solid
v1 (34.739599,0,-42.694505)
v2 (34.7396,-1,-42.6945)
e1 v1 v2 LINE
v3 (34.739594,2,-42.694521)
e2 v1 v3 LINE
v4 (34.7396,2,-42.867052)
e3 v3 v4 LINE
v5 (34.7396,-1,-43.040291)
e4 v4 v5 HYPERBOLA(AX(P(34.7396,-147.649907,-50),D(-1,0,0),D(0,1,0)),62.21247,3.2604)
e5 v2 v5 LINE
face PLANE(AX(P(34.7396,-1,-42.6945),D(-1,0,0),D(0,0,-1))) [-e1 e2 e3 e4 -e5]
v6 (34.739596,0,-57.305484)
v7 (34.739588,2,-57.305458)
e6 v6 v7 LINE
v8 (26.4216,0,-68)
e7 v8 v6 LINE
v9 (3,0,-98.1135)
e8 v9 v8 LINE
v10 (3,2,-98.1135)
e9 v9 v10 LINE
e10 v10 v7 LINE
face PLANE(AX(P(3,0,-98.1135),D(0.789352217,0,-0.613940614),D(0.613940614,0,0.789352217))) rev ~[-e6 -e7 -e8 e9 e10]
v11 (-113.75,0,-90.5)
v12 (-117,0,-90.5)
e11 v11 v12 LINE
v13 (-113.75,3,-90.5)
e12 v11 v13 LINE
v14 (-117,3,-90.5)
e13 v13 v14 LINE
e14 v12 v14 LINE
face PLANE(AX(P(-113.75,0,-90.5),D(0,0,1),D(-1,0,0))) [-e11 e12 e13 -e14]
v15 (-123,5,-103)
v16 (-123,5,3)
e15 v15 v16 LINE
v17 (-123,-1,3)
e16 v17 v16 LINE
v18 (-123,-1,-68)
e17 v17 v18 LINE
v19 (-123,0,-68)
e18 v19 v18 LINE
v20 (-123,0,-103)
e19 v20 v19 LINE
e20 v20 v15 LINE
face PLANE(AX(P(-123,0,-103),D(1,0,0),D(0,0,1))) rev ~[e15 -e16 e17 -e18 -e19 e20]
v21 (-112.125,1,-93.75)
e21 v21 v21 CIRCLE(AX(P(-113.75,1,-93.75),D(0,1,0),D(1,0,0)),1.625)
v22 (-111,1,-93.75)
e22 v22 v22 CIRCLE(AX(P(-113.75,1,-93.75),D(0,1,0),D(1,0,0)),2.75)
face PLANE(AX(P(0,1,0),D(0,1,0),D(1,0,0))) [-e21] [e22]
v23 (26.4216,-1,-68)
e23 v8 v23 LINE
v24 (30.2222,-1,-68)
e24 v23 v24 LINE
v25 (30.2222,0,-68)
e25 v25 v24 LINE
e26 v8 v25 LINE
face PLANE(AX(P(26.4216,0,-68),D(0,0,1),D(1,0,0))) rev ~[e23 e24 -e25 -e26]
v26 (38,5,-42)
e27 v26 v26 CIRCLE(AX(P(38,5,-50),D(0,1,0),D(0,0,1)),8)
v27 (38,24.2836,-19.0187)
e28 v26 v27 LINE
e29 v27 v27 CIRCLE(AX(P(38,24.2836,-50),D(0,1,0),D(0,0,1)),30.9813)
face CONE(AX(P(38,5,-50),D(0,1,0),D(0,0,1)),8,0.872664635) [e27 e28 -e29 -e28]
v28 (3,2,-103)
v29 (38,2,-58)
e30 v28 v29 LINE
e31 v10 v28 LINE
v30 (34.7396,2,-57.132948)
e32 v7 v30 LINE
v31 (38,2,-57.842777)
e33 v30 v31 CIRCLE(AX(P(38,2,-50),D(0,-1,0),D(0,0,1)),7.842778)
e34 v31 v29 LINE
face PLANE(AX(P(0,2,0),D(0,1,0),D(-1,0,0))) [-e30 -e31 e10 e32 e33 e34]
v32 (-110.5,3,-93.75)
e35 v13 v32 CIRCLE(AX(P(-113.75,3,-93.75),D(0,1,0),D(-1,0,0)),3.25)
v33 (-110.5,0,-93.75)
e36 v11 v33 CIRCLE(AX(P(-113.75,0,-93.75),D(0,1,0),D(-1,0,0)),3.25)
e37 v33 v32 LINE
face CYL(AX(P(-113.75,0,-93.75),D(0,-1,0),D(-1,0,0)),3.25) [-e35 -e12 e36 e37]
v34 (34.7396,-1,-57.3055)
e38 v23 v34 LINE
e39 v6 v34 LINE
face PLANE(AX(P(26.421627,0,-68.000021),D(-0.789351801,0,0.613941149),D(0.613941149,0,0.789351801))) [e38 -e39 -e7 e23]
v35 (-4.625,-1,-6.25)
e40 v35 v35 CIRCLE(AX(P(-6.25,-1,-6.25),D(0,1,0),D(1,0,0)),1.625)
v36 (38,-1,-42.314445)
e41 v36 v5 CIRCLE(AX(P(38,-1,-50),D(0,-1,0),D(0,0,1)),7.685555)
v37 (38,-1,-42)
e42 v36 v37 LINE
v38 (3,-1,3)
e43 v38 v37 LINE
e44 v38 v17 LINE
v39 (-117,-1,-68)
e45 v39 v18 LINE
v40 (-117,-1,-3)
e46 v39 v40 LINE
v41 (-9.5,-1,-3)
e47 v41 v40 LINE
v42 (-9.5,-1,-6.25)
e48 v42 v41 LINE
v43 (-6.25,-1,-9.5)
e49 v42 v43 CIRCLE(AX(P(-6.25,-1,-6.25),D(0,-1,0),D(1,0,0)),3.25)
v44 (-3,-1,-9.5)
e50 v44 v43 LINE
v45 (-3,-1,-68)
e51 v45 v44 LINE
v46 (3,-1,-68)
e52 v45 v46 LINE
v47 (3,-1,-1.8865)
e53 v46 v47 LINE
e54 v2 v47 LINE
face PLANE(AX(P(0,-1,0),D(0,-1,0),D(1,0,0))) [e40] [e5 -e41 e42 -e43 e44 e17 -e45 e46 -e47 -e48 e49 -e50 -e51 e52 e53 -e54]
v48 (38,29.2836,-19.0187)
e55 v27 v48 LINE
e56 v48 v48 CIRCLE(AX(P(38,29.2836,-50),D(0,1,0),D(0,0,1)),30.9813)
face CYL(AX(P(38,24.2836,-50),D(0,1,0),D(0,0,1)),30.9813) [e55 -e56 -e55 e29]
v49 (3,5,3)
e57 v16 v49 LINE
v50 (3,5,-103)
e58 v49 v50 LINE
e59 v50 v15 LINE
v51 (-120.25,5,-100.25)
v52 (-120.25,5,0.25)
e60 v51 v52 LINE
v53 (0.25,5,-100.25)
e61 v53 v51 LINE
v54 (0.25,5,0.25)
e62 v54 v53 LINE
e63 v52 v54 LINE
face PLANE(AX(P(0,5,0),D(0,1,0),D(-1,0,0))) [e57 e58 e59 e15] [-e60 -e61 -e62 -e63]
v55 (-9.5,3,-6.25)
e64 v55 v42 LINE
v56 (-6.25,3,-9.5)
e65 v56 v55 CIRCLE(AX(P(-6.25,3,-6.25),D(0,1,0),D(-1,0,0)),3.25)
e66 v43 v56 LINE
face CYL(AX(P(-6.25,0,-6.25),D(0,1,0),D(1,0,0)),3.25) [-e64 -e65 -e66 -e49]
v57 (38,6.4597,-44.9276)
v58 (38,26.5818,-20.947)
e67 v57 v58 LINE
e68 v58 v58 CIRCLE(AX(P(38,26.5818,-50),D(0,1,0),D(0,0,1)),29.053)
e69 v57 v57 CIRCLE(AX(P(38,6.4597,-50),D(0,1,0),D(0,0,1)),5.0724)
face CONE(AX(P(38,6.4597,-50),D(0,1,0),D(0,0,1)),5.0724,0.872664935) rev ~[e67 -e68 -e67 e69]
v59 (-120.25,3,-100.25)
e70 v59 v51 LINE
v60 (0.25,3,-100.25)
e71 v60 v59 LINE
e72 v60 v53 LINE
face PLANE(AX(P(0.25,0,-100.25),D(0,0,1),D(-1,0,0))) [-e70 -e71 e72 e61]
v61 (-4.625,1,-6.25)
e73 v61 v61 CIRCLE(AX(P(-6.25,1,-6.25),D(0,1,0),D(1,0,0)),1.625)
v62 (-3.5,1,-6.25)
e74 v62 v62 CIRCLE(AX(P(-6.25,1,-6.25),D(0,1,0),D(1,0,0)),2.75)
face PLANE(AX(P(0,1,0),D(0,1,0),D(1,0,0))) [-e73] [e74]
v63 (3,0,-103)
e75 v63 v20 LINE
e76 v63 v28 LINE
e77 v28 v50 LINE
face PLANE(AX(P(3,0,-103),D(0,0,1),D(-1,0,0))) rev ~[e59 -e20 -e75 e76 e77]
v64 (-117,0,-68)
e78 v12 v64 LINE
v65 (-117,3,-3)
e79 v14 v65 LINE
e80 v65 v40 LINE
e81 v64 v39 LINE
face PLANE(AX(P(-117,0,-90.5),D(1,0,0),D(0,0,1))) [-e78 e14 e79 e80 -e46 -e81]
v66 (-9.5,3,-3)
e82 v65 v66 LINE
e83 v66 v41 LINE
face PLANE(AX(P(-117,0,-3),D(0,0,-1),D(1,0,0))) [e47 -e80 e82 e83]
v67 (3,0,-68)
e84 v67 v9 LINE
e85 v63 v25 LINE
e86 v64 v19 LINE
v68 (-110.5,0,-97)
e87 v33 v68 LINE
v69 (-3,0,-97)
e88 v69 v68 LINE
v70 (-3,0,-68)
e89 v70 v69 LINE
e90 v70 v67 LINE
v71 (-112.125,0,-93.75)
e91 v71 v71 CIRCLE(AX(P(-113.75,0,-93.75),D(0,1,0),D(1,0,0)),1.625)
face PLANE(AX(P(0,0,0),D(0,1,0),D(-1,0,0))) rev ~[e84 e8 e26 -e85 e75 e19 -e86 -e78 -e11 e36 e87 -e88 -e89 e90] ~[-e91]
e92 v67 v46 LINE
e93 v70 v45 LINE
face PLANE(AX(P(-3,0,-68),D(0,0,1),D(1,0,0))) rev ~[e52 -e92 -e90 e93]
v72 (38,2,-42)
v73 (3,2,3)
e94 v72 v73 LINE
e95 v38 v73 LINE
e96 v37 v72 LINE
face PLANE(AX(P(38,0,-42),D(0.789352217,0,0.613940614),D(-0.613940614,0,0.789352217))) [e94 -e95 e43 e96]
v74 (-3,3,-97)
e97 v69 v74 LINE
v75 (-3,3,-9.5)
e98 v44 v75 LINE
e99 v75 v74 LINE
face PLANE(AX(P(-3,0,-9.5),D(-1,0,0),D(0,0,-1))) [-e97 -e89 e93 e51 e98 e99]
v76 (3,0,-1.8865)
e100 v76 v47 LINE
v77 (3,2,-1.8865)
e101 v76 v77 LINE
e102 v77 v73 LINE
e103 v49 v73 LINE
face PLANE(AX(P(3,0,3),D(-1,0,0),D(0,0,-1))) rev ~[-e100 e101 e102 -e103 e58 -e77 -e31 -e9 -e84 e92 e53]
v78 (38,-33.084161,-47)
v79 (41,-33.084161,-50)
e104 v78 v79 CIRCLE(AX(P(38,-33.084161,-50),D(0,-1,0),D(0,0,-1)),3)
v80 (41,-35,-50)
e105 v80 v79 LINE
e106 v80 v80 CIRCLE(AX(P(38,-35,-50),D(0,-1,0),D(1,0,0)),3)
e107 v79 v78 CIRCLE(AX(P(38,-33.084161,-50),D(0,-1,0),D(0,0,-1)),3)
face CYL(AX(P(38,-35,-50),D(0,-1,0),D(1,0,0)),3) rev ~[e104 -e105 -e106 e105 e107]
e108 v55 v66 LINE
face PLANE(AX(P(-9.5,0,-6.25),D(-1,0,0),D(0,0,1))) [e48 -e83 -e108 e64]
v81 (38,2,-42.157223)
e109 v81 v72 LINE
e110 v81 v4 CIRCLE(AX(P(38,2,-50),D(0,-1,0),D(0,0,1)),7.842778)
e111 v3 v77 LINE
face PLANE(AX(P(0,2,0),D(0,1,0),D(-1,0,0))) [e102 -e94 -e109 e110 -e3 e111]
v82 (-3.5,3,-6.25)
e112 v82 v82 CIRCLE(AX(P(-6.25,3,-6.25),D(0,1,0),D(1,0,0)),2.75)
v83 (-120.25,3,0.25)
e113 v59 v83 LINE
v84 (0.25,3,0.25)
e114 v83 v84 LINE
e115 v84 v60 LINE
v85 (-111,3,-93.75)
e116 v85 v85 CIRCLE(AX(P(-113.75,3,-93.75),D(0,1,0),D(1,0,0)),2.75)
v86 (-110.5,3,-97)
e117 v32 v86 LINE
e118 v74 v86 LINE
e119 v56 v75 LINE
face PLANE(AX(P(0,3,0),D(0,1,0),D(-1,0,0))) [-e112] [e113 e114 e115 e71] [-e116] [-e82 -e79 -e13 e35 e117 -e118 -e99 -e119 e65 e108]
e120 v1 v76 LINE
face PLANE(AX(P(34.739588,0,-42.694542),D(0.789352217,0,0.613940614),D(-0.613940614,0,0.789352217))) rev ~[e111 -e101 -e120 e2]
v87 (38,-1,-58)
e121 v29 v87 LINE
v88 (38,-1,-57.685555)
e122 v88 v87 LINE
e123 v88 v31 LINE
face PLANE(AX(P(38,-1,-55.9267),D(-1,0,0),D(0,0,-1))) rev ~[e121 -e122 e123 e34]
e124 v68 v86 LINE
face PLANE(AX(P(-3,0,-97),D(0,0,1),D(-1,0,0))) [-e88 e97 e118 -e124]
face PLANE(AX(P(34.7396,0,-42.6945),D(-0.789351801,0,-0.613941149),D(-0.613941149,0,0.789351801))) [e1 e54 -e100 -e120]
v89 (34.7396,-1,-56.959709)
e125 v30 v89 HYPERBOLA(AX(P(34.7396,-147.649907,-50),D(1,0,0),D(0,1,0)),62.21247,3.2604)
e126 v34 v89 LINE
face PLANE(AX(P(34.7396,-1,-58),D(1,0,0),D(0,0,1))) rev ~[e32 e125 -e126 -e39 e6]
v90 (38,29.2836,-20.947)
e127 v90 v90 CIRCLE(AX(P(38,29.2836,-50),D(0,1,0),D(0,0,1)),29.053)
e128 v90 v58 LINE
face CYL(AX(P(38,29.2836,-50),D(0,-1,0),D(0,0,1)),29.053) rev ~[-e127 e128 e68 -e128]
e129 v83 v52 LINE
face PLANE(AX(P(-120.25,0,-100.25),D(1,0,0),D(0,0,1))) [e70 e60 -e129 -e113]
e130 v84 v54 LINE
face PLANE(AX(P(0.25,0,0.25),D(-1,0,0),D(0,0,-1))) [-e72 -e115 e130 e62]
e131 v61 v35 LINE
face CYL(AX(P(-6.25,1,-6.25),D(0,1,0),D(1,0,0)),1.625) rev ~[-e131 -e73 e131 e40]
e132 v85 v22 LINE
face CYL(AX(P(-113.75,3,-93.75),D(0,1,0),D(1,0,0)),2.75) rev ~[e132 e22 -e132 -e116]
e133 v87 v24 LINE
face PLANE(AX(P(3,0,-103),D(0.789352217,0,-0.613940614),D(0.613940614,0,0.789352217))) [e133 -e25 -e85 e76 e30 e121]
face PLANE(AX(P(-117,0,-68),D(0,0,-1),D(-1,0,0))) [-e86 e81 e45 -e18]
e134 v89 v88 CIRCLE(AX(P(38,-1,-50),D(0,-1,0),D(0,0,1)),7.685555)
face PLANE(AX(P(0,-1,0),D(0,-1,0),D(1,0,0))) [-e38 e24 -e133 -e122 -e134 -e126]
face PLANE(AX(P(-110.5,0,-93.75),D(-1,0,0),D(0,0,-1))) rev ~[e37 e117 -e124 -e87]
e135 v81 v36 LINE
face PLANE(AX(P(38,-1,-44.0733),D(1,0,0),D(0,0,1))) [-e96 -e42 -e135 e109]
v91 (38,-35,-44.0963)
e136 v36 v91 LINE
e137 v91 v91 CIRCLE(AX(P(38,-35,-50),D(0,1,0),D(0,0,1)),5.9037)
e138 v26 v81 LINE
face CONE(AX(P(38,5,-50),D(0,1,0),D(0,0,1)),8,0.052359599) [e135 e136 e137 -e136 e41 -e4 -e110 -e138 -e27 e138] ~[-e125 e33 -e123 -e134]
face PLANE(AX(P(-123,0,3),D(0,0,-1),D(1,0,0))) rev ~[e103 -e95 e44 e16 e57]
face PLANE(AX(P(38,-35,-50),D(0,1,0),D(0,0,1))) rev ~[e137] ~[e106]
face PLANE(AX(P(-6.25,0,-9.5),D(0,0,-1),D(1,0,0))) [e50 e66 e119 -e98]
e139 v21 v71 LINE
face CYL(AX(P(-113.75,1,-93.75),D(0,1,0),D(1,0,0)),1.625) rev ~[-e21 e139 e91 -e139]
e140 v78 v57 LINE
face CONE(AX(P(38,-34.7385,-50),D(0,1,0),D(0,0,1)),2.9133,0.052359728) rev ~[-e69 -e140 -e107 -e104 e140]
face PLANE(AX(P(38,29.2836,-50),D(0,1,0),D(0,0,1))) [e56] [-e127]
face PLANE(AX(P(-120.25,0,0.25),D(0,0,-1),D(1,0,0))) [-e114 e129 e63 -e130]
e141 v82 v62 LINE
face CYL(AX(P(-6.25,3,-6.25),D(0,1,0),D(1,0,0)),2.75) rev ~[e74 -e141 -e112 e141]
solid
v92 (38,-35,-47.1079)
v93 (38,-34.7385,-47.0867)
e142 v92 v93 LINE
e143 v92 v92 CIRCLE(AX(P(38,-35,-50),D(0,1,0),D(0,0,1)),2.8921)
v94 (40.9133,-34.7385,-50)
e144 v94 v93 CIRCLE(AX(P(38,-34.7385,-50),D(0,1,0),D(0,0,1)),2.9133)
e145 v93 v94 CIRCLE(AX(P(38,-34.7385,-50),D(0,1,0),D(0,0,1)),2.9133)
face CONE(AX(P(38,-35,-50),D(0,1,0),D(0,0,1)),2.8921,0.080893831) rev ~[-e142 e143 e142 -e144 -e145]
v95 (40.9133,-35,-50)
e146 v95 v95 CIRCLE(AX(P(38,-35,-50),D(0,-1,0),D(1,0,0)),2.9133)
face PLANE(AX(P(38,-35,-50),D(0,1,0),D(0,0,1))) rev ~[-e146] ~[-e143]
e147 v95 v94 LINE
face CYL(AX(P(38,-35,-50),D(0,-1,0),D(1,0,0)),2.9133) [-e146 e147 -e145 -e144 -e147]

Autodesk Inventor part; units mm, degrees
ref_plane "YZ Plane" through (0, 0, 0) normal (1, 0, 0) x (0, 1, 0)
ref_plane "XZ Plane" through (0, 0, 0) normal (0, 1, 0) x (-1, 0, 0)
ref_plane "XY Plane" through (0, 0, 0) normal (0, 0, 1) x (1, 0, 0)
sketch "Sketch1" plane through (0, 0, 0) normal (0, 1, 0) x (-1, 0, 0)
  line L0 (0, 0) -> (120, 0)
  line L1 (120, 0) -> (120, -100)
  line L2 (120, -100) -> (0, -100)
  line L3 (0, -100) -> (0, 0)
  line L4 (117, -97) -> (117, -3)
  line L5 (117, -3) -> (3, -3)
  line L6 (3, -3) -> (3, -97)
  line L7 (3, -97) -> (117, -97)
  line L8 (123, -103) -> (123, 3)
  line L9 (123, 3) -> (-3, 3)
  line L10 (-3, 3) -> (-3, -103)
  line L11 (-3, -103) -> (123, -103)
  line L12 (120.25, -100.25) -> (120.25, 0.25)
  line L13 (120.25, 0.25) -> (-0.25, 0.25)
  line L14 (-0.25, 0.25) -> (-0.25, -100.25)
  line L15 (-0.25, -100.25) -> (120.25, -100.25)
  circle A0 centre (6.25, -6.25) radius 3.25
  line L16 (9.5, -6.25) -> (9.5, -3)
  line L17 (6.25, -9.5) -> (3, -9.5)
  circle A1 centre (113.75, -93.75) radius 3.25
  line L18 (113.75, -90.5) -> (117, -90.5)
  line L19 (110.5, -93.75) -> (110.5, -97)
  dimension "d0" = 120
  dimension "d1" = 100
  dimension "d2" = 3
  dimension "d3" = 3
  dimension "d4" = 0.25
  dimension "d9" = 6.5
  dimension "d10" = 3.25
  dimension "d11" = 3.25
  dimension "d12" = 3.25
  dimension "d13" = 6.5
  dimension "d14" = 3.25
  dimension "d15" = 3.25
extrude "Extrusion1" add sketch "Sketch1" along normal blind 3 contours L0 L1 L2 L3 | L7 A1 L4 | A1 L18 L4 | A1 | L7 L19 A1 | L16 A0 L5 | L6 A0 L17 | A0 L6 L5 | A0 | L15 L14 L13 L12
extrude "Extrusion2" add sketch "Sketch1" along normal blind 5 contours L11 L10 L9 L8
sketch "Sketch2" plane through (0, 0, 0) normal (0, -1, 0) x (1, 0, 0)
  line L0 (3, -103) -> (-123, -103) construction
  line L1 (-60, -103) -> (-60, 3.5996) construction
  line L2 (-3, -97) -> (-3, -9.5) projected
  line L3 (3, -103) -> (-3, -103)
  line L4 (-3, -103) -> (-3, -68)
  line L5 (-3, -68) -> (3, -68)
  line L6 (3, -68) -> (3, -103)
  line L7 (-3, -97) -> (-60, -97)
  line L8 (-60, -97) -> (-60, -103)
  line L9 (-60, -103) -> (-3, -103)
  line L10 (-3, -103) -> (-3, -97)
  line L11 (-123, -103) -> (3, -103) construction
  line L12 (-117, -97) -> (-117, -9.5)
  line L13 (-123, -103) -> (-117, -103)
  line L14 (-117, -103) -> (-117, -68)
  line L15 (-117, -68) -> (-123, -68)
  line L16 (-123, -68) -> (-123, -103)
  line L17 (-117, -97) -> (-60, -97)
  line L18 (-60, -103) -> (-117, -103)
  line L19 (-117, -103) -> (-117, -97)
  circle A0 centre (-113.75, -93.75) radius 3.25
  line L20 (-117, -90.5) -> (-113.75, -90.5) projected
  line L21 (-117, -90.5) -> (-113.75, -90.5)
  line L22 (-110.5, -93.75) -> (-110.5, -97)
  line L23 (-123, -68) -> (-117, -68)
  line L24 (-117, -68) -> (-117, 3)
  line L25 (-117, 3) -> (-123, 3)
  line L26 (-123, 3) -> (-123, -68)
  line L27 (-9.5, -3) -> (-117, -3) projected
  line L28 (-123, 3) -> (3, 3) projected
  line L29 (-117, -3) -> (3, -3)
  line L30 (3, -3) -> (3, 3)
  line L31 (3, 3) -> (-117, 3)
  line L32 (-117, 3) -> (-117, -3)
  line L33 (-3, -68) -> (3, -68)
  line L34 (3, -68) -> (3, -3)
  line L35 (3, -3) -> (-3, -3)
  line L36 (-3, -3) -> (-3, -68)
  circle A1 centre (-6.25, -6.25) radius 3.25
  arc A2 (-9.5, -6.25) -> (-6.25, -9.5) centre (-6.25, -6.25) ccw projected
  line L37 (-3, -9.5) -> (-6.25, -9.5)
  line L38 (-9.5, -6.25) -> (-9.5, -3)
  point P0 (0, 0)
  point P1 (-117, 3)
  point P2 (-117, -9.5)
  dimension "d16" = 35
  dimension "d17" = 6.5
  dimension "d18" = 3.25
  dimension "d19" = 3.25
  dimension "d20" = 3.25
  dimension "d21" = 106.5996
  dimension "d67" = 0
  dimension "d68" = 0
  dimension "d69" = 0
  dimension "d70" = 6.5
extrude "Extrusion3" add sketch "Sketch2" along normal blind 1 contours L2 L36 L29 L34 L5 | L37 A1 L36 | A1 L29 L36 | A1 | L29 L27 L24 L28 L30 | A1 L38 L29 | L24 L12 L15 L26 L25
ref_plane "Work Plane1" through (38, 0, 3) normal (1, 0, 0) x (0, 0, -1)
sketch "Sketch3" plane through (38, 0, 3) normal (1, 0, 0) x (0, 0, -1)
  line L0 (53, -10.8881) -> (53, 16.7673)
  line L1 (106, 5) -> (0, 5) construction
  line L2 (106, 0) -> (106, 5) construction
  line L3 (106, 5) -> (106, -1) construction
  line L4 (45, 5) -> (22.0187, 24.2836)
  line L5 (45, 5) -> (47.0963, -35)
  line L6 (53, 5) -> (37.5678, 5) construction
  line L7 (50.0867, -34.7385) -> (47.9276, 6.4597)
  line L8 (47.9276, 6.4597) -> (23.947, 26.5818)
  line L9 (22.0187, 24.2836) -> (23.947, 26.5818)
  line L10 (22.0187, 24.2836) -> (22.0187, 29.2836)
  line L11 (22.0187, 29.2836) -> (23.947, 29.2836)
  line L12 (23.947, 29.2836) -> (23.947, 26.5818)
  line L13 (47.0963, -35) -> (50.1079, -35)
  line L14 (50.1079, -35) -> (50.0867, -34.7385)
  point P0 (3, 0)
  dimension "d26" = 106
  dimension "d27" = 16
  dimension "d28" = 30
  dimension "d29" = 93
  dimension "d30" = 40
  dimension "d31" = 40
  dimension "d32" = 3
  dimension "d34" = 3
  dimension "d37" = 5
  dimension "d48" = 0.2615
  dimension "d49" = 3.0116
revolve "Revolution1" add sketch "Sketch3" angle 360 about axis through (38, -10.8881, -50) along (0, 1, 0)
sketch "Sketch4" plane through (0, 0, 0) normal (0, 1, 0) x (-1, 0, 0)
  line L0 (-3, -68) -> (-3, -103) projected
  circle A0 centre (-38, -50) radius 8 projected
  line L1 (-3, -1.8865) -> (-3, 3)
  line L2 (-3, -103) -> (-3, -98.1135)
  circle A1 centre (-38, -50) radius 5.0724 projected
  circle A2 centre (-38, -50) radius 5.9037 projected
  line L3 (-38, -50) -> (-3, -50) construction
  line L4 (-3, -103) -> (-3, -98.1135) construction
  line L5 (-38.3984, -57.7256) -> (-35.0429, -57.1307) construction
  line L6 (-3, 3) -> (-3, -1.8865)
  line L7 (-3, 3) -> (-3, -1.8865) construction
  line L8 (-38.3984, -42.2744) -> (-35.0429, -42.8693) construction
  line L9 (-3, -103) -> (-38, -58)
  line L10 (-38, -42) -> (-3, 3)
  line L11 (-0.6319, -101.1582) -> (-35.6319, -56.1582)
  line L12 (-35.6319, -43.8418) -> (-0.6319, 1.1582)
  point P0 (0, 0)
  point P1 (-34.7396, -42.6945)
  point P2 (-34.7396, -57.3055)
  dimension "d74" = 3
  dimension "d75" = 3
extrude "Extrusion4" add sketch "Sketch4" along normal blind 2 contours L0 L9 A0 L11 | L10 L1 L12 A0
sketch "Sketch6" plane through (38, -35, -50) normal (0, -1, 0) x (1, 0, 0)
  circle A0 centre (0, 0) radius 2.9133 projected
  circle A1 centre (0, 0) radius 3
  point P0 (-38, 50)
  dimension "d50" = 6
extrude "Extrusion6" cut sketch "Sketch6" against normal through all
sketch "Sketch7" plane through (0, 3, 0) normal (0, 1, 0) x (1, 0, 0)
  circle A0 centre (-113.75, 93.75) radius 2.75
  arc A1 (-113.75, 90.5) -> (-110.5, 93.75) centre (-113.75, 93.75) ccw projected
  circle A2 centre (-6.25, 6.25) radius 2.75
  arc A3 (-6.25, 9.5) -> (-9.5, 6.25) centre (-6.25, 6.25) ccw projected
  point P0 (0, 0)
  dimension "d53" = 5.5
  dimension "d54" = 0
  dimension "d55" = 0
  dimension "d56" = 5.5
  dimension "d57" = 0
  dimension "d58" = 0
extrude "Extrusion7" cut sketch "Sketch7" against normal blind 2
sketch "Sketch8" plane through (-6.25, 1, -6.25) normal (0, 1, 0) x (1, 0, 0)
  circle A0 centre (0, 0) radius 1.625
  circle A1 centre (0, 0) radius 2.75 projected
  circle A2 centre (-107.5, 87.5) radius 1.625
  circle A3 centre (-107.5, 87.5) radius 2.75 projected
  point P0 (6.25, -6.25)
  dimension "d61" = 3.25
  dimension "d62" = 1.125
  dimension "d63" = 3.25
  dimension "d64" = 1.125
extrude "Extrusion8" cut sketch "Sketch8" against normal blind 2 contours A0 | A2
sketch "Sketch9" plane through (0, 0, 0) normal (0, -1, 0) x (1, 0, 0)
  line L0 (3, -68) -> (-3, -68) projected
  line L1 (0, -68) -> (30.2222, -68)
  line L2 (3, -1.8865) -> (3, 3)
  line L3 (34.7396, -42.6945) -> (3, -1.8865) projected
  line L4 (3, -1.8865) -> (34.7396, -42.6945)
  line L5 (3, 3) -> (-123, 3) projected
  line L6 (3, 3) -> (38, -42)
  circle A0 centre (38, -50) radius 8 projected
  line L7 (38, -58) -> (3, -103) projected
  line L8 (30.2222, -68) -> (38, -58)
  line L9 (3, -98.1135) -> (34.7396, -57.3055) projected
  line L10 (34.7396, -57.3055) -> (26.4216, -68)
  point P0 (0, 0)
extrude "Extrusion9" add sketch "Sketch9" along normal blind 1 contours L9 A0 L7 L1 | L3 L2 L6 A0
sketch "Sketch11" plane through (0, 2, 0) normal (0, 1, 0) x (1, 0, 0)
  arc A0 (34.7396, 42.6945) -> (38, 42) centre (38, 50) ccw projected
  circle A1 centre (38, 50) radius 5.9037 projected
  circle A2 centre (38, 50) radius 8 projected
  point P0 (0, 0)
  point P1 (38.1855, 42.0022)
sketch "Sketch12" plane through (0, -1, 0) normal (0, -1, 0) x (1, 0, 0)
  arc A0 (38, -42) -> (34.7396, -42.6945) centre (38, -50) ccw projected
  line L0 (38, -42) -> (34.7396, -42)
  line L1 (34.7396, -42) -> (34.7396, -44.0733)
  line L2 (34.7396, -44.0733) -> (38, -44.0733)
  line L3 (38, -44.0733) -> (38, -42)
  circle A1 centre (38, -50) radius 8 construction
  line L4 (46, -50) -> (30, -50) construction
  line L5 (38, -58) -> (34.7396, -58)
  line L6 (34.7396, -58) -> (34.7396, -55.9267)
  line L7 (34.7396, -55.9267) -> (38, -55.9267)
  line L8 (38, -55.9267) -> (38, -58)
  point P0 (0, 0)
  dimension "d76" = 0
extrude "Extrusion10" add sketch "Sketch12" against normal blind 3 contours L3 L2 L1 A0 | L5 L6 L7 L8
properties part number "ResoarHållare"
